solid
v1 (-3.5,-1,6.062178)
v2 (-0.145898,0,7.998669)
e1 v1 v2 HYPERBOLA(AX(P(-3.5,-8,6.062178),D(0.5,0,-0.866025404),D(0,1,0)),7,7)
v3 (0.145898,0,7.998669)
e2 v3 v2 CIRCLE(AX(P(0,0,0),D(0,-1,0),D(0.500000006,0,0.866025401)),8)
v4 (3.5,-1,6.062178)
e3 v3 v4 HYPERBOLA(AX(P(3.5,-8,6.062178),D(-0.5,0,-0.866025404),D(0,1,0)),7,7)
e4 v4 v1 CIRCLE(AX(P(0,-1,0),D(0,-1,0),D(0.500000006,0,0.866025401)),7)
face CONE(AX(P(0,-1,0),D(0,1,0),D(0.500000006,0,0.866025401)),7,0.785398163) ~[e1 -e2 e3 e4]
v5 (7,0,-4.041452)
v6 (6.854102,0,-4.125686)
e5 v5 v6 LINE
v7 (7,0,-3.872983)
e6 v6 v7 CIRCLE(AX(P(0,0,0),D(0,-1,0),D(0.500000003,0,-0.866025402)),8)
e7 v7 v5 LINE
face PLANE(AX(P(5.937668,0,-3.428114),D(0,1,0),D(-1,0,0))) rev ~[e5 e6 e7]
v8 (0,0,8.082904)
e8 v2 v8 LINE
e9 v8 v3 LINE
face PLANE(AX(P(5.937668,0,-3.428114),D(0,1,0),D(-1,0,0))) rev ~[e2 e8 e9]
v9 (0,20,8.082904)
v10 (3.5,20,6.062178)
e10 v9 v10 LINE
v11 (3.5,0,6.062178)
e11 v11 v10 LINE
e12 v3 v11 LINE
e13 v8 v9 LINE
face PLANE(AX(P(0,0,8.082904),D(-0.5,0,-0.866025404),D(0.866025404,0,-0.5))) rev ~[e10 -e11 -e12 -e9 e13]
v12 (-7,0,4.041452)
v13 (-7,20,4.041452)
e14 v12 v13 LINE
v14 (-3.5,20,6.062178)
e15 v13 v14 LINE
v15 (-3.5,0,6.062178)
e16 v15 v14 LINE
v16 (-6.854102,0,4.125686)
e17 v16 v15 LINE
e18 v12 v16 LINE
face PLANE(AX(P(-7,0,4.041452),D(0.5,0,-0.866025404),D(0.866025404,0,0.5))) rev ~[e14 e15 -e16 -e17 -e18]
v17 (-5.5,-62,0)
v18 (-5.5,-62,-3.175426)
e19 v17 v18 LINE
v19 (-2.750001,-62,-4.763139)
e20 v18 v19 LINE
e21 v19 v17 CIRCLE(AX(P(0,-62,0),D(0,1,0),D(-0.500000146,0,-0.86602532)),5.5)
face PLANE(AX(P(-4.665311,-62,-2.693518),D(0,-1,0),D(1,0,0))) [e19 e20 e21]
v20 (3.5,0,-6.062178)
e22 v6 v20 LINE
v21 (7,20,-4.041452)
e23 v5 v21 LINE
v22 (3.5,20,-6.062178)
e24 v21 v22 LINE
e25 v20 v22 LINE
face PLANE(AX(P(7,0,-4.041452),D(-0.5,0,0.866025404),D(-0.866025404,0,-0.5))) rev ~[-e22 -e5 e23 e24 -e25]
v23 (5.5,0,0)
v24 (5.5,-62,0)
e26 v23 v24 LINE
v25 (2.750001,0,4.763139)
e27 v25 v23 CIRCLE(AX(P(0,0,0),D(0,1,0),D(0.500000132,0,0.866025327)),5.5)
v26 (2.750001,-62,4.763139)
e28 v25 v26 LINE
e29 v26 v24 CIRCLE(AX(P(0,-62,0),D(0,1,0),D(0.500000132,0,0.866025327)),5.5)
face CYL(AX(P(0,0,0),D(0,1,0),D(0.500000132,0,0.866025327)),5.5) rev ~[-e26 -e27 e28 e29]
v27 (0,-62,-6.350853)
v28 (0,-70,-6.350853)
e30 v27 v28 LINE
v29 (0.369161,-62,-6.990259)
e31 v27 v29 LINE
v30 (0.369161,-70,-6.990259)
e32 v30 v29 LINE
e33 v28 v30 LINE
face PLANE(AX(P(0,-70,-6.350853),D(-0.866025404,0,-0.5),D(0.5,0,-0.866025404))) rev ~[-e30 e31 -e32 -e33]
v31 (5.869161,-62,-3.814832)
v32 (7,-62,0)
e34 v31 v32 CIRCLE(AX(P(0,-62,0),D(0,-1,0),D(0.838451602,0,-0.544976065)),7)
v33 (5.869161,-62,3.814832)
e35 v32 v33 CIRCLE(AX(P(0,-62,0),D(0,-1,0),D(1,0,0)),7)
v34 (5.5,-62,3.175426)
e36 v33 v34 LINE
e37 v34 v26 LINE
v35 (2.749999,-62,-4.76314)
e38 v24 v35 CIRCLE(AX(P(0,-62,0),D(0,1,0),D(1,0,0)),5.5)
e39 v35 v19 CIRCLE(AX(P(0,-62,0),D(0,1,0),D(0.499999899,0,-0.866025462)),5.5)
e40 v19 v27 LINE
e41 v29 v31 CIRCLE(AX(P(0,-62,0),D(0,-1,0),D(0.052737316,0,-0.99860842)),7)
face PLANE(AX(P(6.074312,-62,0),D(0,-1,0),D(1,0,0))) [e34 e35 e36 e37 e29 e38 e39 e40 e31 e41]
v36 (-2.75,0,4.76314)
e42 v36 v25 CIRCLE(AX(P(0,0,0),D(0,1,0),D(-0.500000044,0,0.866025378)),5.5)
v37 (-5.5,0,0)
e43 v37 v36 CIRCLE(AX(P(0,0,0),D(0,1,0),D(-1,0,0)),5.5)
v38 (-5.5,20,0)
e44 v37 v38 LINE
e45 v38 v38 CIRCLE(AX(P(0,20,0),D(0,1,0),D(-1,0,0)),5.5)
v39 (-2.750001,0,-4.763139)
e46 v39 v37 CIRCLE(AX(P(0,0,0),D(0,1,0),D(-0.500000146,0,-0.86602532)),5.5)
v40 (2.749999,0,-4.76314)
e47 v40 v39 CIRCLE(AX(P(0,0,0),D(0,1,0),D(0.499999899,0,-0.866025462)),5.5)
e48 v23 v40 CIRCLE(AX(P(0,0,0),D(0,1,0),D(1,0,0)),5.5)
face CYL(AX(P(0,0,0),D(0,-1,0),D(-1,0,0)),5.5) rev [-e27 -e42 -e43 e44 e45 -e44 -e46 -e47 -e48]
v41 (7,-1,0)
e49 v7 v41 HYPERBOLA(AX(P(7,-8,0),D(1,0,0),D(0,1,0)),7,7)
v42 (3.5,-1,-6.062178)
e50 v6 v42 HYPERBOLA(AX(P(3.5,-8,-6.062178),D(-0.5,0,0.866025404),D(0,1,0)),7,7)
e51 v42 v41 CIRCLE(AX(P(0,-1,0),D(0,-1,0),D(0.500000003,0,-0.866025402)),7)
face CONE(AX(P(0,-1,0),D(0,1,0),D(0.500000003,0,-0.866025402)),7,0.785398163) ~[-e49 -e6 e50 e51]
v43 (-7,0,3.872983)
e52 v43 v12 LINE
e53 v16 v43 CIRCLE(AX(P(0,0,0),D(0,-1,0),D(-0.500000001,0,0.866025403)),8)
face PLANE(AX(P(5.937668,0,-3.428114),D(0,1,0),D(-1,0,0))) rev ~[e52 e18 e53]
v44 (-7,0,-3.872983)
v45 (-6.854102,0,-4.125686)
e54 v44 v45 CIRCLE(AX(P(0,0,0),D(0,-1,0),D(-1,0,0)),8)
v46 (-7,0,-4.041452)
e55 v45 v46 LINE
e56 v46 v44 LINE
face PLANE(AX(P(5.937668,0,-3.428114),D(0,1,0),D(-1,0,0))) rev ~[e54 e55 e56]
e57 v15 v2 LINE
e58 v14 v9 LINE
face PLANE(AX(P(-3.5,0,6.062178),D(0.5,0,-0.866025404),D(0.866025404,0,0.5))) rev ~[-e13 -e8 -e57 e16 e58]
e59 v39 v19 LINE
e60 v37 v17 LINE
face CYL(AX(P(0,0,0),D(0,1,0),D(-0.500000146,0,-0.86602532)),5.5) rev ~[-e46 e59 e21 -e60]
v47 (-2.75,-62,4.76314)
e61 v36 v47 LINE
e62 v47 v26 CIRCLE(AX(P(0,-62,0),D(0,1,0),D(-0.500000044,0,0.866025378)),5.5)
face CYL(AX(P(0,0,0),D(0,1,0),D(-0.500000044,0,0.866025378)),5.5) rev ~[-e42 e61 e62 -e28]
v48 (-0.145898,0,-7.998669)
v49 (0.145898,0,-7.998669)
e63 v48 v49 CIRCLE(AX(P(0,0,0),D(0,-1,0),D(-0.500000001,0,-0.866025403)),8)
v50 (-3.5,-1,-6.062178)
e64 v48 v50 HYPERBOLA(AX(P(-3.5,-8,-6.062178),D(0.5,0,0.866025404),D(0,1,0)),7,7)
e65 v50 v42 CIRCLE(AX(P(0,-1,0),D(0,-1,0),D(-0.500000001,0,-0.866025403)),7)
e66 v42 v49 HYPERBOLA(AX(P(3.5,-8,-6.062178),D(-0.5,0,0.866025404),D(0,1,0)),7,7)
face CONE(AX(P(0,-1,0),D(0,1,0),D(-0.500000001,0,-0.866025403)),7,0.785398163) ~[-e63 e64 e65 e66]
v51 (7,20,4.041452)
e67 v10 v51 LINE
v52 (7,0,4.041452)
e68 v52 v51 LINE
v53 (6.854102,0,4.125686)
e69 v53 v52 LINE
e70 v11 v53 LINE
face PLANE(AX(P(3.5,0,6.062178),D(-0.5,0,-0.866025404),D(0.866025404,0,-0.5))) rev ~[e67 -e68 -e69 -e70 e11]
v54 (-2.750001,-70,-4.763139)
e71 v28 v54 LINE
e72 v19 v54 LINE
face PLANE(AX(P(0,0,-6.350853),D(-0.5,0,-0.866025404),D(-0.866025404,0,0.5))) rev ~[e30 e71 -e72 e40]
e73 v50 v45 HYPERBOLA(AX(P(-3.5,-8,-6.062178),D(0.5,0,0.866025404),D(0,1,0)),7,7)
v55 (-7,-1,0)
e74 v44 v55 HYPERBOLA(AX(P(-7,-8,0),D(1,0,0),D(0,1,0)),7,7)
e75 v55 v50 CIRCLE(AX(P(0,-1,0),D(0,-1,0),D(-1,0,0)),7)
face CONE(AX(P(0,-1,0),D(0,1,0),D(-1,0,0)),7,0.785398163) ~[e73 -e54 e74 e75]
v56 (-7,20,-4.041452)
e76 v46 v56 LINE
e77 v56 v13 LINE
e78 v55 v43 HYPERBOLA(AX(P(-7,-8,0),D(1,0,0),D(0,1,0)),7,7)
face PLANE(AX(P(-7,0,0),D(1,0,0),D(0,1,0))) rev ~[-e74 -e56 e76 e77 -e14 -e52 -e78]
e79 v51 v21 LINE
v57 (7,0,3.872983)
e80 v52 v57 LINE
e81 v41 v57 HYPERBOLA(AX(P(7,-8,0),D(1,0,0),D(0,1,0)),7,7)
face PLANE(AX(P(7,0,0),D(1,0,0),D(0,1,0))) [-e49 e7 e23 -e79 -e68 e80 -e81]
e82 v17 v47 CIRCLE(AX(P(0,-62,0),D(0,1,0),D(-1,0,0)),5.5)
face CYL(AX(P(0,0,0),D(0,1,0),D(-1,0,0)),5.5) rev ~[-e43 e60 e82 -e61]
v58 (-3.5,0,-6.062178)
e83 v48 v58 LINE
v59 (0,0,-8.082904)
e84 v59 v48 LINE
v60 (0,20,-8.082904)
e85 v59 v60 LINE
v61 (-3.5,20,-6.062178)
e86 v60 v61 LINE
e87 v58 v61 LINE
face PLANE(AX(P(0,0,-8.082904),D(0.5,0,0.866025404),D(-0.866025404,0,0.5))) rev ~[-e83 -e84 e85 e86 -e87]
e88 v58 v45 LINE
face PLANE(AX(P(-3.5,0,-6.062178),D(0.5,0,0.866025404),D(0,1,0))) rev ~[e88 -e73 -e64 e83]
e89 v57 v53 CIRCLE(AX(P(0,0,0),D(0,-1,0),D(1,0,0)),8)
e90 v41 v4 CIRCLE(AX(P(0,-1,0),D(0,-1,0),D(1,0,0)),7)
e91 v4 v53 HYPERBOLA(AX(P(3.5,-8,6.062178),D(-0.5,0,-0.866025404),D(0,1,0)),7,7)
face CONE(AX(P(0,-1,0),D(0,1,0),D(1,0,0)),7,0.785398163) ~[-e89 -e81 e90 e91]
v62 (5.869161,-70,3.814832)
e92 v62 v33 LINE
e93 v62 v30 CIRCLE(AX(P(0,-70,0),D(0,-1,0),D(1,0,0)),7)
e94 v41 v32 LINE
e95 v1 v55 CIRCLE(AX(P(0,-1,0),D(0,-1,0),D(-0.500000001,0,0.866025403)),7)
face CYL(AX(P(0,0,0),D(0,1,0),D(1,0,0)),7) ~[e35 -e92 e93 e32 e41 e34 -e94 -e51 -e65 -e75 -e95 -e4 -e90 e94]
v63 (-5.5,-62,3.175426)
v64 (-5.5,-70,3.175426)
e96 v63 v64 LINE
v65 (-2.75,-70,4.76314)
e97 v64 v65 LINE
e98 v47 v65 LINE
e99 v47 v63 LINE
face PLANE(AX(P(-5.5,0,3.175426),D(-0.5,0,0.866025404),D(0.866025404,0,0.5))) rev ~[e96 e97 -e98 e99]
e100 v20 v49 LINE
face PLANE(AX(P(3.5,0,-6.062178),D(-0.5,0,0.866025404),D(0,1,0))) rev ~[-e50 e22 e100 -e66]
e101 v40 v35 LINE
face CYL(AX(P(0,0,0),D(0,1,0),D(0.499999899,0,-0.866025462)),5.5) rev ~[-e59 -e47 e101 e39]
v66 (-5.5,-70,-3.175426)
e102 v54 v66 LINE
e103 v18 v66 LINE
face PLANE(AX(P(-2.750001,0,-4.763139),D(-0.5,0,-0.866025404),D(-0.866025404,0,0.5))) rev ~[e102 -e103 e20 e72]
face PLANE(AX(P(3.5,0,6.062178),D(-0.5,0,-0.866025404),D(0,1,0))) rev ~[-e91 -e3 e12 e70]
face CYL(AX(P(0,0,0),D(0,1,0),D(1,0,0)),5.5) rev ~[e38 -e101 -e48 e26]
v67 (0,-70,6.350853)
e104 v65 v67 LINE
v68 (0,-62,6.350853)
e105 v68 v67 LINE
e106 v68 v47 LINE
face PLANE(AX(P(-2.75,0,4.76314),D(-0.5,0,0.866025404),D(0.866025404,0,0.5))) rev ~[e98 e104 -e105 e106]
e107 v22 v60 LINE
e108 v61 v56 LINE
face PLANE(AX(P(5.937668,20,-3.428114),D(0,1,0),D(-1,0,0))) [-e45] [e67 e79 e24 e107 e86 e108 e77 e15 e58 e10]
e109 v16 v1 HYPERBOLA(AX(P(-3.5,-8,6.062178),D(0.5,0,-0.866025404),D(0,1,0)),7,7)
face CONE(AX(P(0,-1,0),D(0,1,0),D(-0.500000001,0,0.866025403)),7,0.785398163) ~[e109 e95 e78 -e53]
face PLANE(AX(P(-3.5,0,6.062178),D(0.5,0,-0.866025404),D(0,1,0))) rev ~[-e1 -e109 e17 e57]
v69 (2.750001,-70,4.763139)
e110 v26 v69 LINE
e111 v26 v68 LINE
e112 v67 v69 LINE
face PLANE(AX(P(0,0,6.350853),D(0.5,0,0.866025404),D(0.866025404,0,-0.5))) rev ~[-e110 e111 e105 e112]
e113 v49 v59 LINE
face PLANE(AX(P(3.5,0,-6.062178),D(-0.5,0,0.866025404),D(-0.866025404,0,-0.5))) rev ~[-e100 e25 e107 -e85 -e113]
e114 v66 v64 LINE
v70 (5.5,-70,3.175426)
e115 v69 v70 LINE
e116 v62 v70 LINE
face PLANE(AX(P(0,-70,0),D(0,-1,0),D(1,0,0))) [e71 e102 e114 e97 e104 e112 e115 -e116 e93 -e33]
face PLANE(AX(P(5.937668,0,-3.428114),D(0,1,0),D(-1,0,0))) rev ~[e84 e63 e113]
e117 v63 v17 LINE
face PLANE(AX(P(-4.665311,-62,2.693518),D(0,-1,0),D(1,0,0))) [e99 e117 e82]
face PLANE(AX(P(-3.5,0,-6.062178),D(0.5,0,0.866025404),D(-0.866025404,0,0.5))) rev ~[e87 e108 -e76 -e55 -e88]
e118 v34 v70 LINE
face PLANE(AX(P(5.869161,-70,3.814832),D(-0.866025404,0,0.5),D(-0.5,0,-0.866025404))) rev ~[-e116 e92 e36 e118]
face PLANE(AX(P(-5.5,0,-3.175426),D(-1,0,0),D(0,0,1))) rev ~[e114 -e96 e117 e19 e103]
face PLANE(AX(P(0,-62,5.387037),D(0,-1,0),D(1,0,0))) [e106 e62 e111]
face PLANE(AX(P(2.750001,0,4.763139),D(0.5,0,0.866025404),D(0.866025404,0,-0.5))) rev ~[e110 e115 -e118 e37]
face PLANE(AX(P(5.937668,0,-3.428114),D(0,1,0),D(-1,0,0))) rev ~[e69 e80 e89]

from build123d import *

# Parameters (mm, degrees)
F0_R         = 7
F1_DEPTH     = 70
F2_DEPTH     = 62
F3_R         = 5.5
F4_DEPTH     = 20
F6_DEPTH     = 8
F7_T4_ANGLE  = 59.9999999128
F7_T10_ANGLE = 59.9999996333
F7_T16_ANGLE = 60.0000004539
F7_T22_ANGLE = 59.9999999128
F7_T28_ANGLE = 60.0000002811
F7_T34_ANGLE = 59.9999998061


# Not quite as in the source:
# - a fillet or chamfer that OpenCascade refuses, or shapes differently, is made with other operations: its cross-section is extruded or revolved along the edge and cut away or added


with BuildPart() as f1:
    # F0 (on Front) → F1 (new body)
    with BuildSketch(Plane.XZ):
        Circle(F0_R)
        Polygon((2.7500007272, 4.7631393009), (5.5, 3.1754264805), (5.5, 0), (5.5, -3.1754264805), (2.7499994424, -4.7631400427), (0, -6.3508529611), (-2.7500008008, -4.7631392585), (-5.5, -3.1754264805), (-5.5, 0), (-5.5, 3.1754264805), (-2.7500002446, 4.7631395796), (0, 6.3508529611), align=None, mode=Mode.SUBTRACT)
    extrude(amount=F1_DEPTH)

    # F0 (on Front) → F2 (join)
    with BuildSketch(Plane.XZ):
        with BuildLine():
            Line((5.5, -3.1754264805), (5.5, 0))
            ThreePointArc((5.5, 0), (4.7631395599, -2.7500002788), (2.7499994424, -4.7631400427))
            Line((2.7499994424, -4.7631400427), (5.5, -3.1754264805))
        make_face()
        with BuildLine():
            Line((0, -6.3508529611), (2.7499994424, -4.7631400427))
            ThreePointArc((2.7499994424, -4.7631400427), (-7.842e-07, -5.5), (-2.7500008008, -4.7631392585))
            Line((-2.7500008008, -4.7631392585), (0, -6.3508529611))
        make_face()
        with BuildLine():
            Line((-5.5, -3.1754264805), (-2.7500008008, -4.7631392585))
            ThreePointArc((-2.7500008008, -4.7631392585), (-4.763139952, -2.7499995996), (-5.5, 0))
            Line((-5.5, 0), (-5.5, -3.1754264805))
        make_face()
        with BuildLine():
            ThreePointArc((-5.5, 0), (-4.7631397914, 2.7499998777), (-2.7500002446, 4.7631395796))
            Line((-2.7500002446, 4.7631395796), (-5.5, 3.1754264805))
            Line((-5.5, 3.1754264805), (-5.5, 0))
        make_face()
        with BuildLine():
            ThreePointArc((-2.7500002446, 4.7631395796), (2.787e-07, 5.5), (2.7500007272, 4.7631393009))
            Line((2.7500007272, 4.7631393009), (0, 6.3508529611))
            Line((0, 6.3508529611), (-2.7500002446, 4.7631395796))
        make_face()
        with BuildLine():
            Line((5.5, 0), (5.5, 3.1754264805))
            Line((5.5, 3.1754264805), (2.7500007272, 4.7631393009))
            ThreePointArc((2.7500007272, 4.7631393009), (4.7631399308, 2.7499996364), (5.5, 0))
        make_face()
    extrude(amount=F2_DEPTH)

    # F3 (on face) → F4 (join)
    with BuildSketch(Plane(origin=(0, 0, 0), x_dir=(-1, 0, 0), z_dir=(0, 1, 0))):
        with BuildLine():
            Line((-7, 0), (-7, -4.0414518843))
            Line((-7, -4.0414518843), (-3.5000000457, -6.0621778001))
            ThreePointArc((-3.5000000457, -6.0621778001), (-6.0621778397, -3.4999999772), (-7, 0))
        make_face()
        with BuildLine():
            Line((-7, 4.0414518843), (-7, 0))
            ThreePointArc((-7, 0), (-6.0621778147, 3.5000000204), (-3.4999999591, 6.0621778501))
            Line((-3.4999999591, 6.0621778501), (-7, 4.0414518843))
        make_face()
        with BuildLine():
            ThreePointArc((-3.4999999591, 6.0621778501), (-6.0621778147, 3.5000000204), (-7, 0))
            ThreePointArc((-7, 0), (-6.0621778397, -3.4999999772), (-3.5000000457, -6.0621778001))
            ThreePointArc((-3.5000000457, -6.0621778001), (-3.61e-08, -7), (3.4999999831, -6.0621778362))
            ThreePointArc((3.4999999831, -6.0621778362), (6.0621778216, -3.5000000084), (7, 0))
            ThreePointArc((7, 0), (6.06217782, 3.5000000113), (3.4999999774, 6.0621778395))
            ThreePointArc((3.4999999774, 6.0621778395), (1.05e-08, 7), (-3.4999999591, 6.0621778501))
        make_face()
        Circle(F3_R, mode=Mode.SUBTRACT)
        with BuildLine():
            ThreePointArc((3.4999999831, -6.0621778362), (-3.61e-08, -7), (-3.5000000457, -6.0621778001))
            Line((-3.5000000457, -6.0621778001), (0, -8.0829037687))
            Line((0, -8.0829037687), (3.4999999831, -6.0621778362))
        make_face()
        with BuildLine():
            Line((0, 8.0829037687), (-3.4999999591, 6.0621778501))
            ThreePointArc((-3.4999999591, 6.0621778501), (1.05e-08, 7), (3.4999999774, 6.0621778395))
            Line((3.4999999774, 6.0621778395), (0, 8.0829037687))
        make_face()
        with BuildLine():
            ThreePointArc((7, 0), (6.0621778216, -3.5000000084), (3.4999999831, -6.0621778362))
            Line((3.4999999831, -6.0621778362), (7, -4.0414518843))
            Line((7, -4.0414518843), (7, 0))
        make_face()
        with BuildLine():
            Line((7, 4.0414518843), (3.4999999774, 6.0621778395))
            ThreePointArc((3.4999999774, 6.0621778395), (6.06217782, 3.5000000113), (7, 0))
            Line((7, 0), (7, 4.0414518843))
        make_face()
    extrude(amount=F4_DEPTH)

    # F5 (on face) → F6 (cut, through all)
    with BuildSketch(Plane.XZ.offset(70)):
        with BuildLine():
            Line((5.5, 3.1754264805), (5.5, -3.1754264805))
            Line((5.5, -3.1754264805), (5.869161212, -3.814832456))
            ThreePointArc((5.869161212, -3.814832456), (6.7113384837, -1.9894561463), (7, 0))
            ThreePointArc((7, 0), (6.7113384837, 1.9894561463), (5.869161212, 3.814832456))
            Line((5.869161212, 3.814832456), (5.5, 3.1754264805))
        make_face()
        with BuildLine():
            Line((5.869161212, -3.814832456), (5.5, -3.1754264805))
            Line((5.5, -3.1754264805), (0, -6.3508529611))
            Line((0, -6.3508529611), (0.369161212, -6.9902589365))
            ThreePointArc((0.369161212, -6.9902589365), (3.5, -6.0621778265), (5.869161212, -3.814832456))
        make_face()
    extrude(amount=-F6_DEPTH, mode=Mode.SUBTRACT)

    # F7: chamfer of 1 on 6 edges, made by hand


with BuildPart() as f7_tool2:
    # F7_s3 → F7_t4 (revolve)
    with BuildSketch(Plane.XY):
        Polygon((-7, -1), (-8, 0), (-7, 0), align=None)
    revolve(axis=Axis((0, 0, 0), (0, -1, 0)), revolution_arc=F7_T4_ANGLE)

    split(bisect_by=Plane.YZ.offset(-7), keep=Keep.TOP)

    split(bisect_by=Plane(origin=(-3.5, 0, -6.0621778265), x_dir=(0, 1, 0), z_dir=(0.5, 0, 0.8660254038)), keep=Keep.TOP)


with BuildPart() as f1_1:
    add(f1.part)

    # F7_t1: union F7_tool2
    add(f7_tool2.part)


with BuildPart() as f7_tool8:
    # F7_s9 → F7_t10 (revolve)
    with BuildSketch(Plane.XY):
        Polygon((7, -1), (8, 0), (7, 0), align=None)
    revolve(axis=Axis((0, 0, 0), (0, -1, 0)), revolution_arc=F7_T10_ANGLE)

    split(bisect_by=Plane(origin=(3.5, 0, 6.0621778265), x_dir=(0, 1, 0), z_dir=(-0.5, 0, -0.8660254038)), keep=Keep.TOP)

    split(bisect_by=Plane.YZ.offset(7), keep=Keep.BOTTOM)


with BuildPart() as f1_2:
    add(f1_1.part)

    # F7_t7: union F7_tool8
    add(f7_tool8.part)


with BuildPart() as f7_tool14:
    # F7_s15 → F7_t16 (revolve)
    with BuildSketch(Plane(origin=(0, 0, 0), x_dir=(0, 1, 0), z_dir=(0.8660254006, 0, -0.5000000055))):
        Polygon((-1, 7), (0, 8), (0, 7), align=None)
    revolve(axis=Axis((0, 0, 0), (0, -1, 0)), revolution_arc=F7_T16_ANGLE)

    split(bisect_by=Plane(origin=(3.5, 0, 6.0621778265), x_dir=(0, 1, 0), z_dir=(-0.5, 0, -0.8660254038)), keep=Keep.TOP)

    split(bisect_by=Plane(origin=(-3.5, 0, 6.0621778265), x_dir=(0, 1, 0), z_dir=(0.5, 0, -0.8660254038)), keep=Keep.TOP)


with BuildPart() as f1_3:
    add(f1_2.part)

    # F7_t13: union F7_tool14
    add(f7_tool14.part)


with BuildPart() as f7_tool20:
    # F7_s21 → F7_t22 (revolve)
    with BuildSketch(Plane(origin=(0, 0, 0), x_dir=(0, 1, 0), z_dir=(0.866025403, 0, 0.5000000013))):
        Polygon((-1, 7), (0, 8), (0, 7), align=None)
    revolve(axis=Axis((0, 0, 0), (0, -1, 0)), revolution_arc=F7_T22_ANGLE)

    split(bisect_by=Plane(origin=(-3.5, 0, 6.0621778265), x_dir=(0, 1, 0), z_dir=(0.5, 0, -0.8660254038)), keep=Keep.TOP)

    split(bisect_by=Plane.YZ.offset(-7), keep=Keep.TOP)


with BuildPart() as f1_4:
    add(f1_3.part)

    # F7_t19: union F7_tool20
    add(f7_tool20.part)


with BuildPart() as f7_tool26:
    # F7_s27 → F7_t28 (revolve)
    with BuildSketch(Plane(origin=(0, 0, 0), x_dir=(0, 1, 0), z_dir=(-0.866025403, 0, 0.5000000013))):
        Polygon((-1, 7), (0, 8), (0, 7), align=None)
    revolve(axis=Axis((0, 0, 0), (0, -1, 0)), revolution_arc=F7_T28_ANGLE)

    split(bisect_by=Plane(origin=(3.5, 0, -6.0621778265), x_dir=(0, 1, 0), z_dir=(-0.5, 0, 0.8660254038)), keep=Keep.TOP)

    split(bisect_by=Plane(origin=(-3.5, 0, -6.0621778265), x_dir=(0, 1, 0), z_dir=(0.5, 0, 0.8660254038)), keep=Keep.TOP)


with BuildPart() as f1_5:
    add(f1_4.part)

    # F7_t25: union F7_tool26
    add(f7_tool26.part)


with BuildPart() as f7_tool32:
    # F7_s33 → F7_t34 (revolve)
    with BuildSketch(Plane(origin=(0, 0, 0), x_dir=(0, 1, 0), z_dir=(-0.8660254021, 0, -0.5000000029))):
        Polygon((-1, 7), (0, 8), (0, 7), align=None)
    revolve(axis=Axis((0, 0, 0), (0, -1, 0)), revolution_arc=F7_T34_ANGLE)

    split(bisect_by=Plane(origin=(3.5, 0, -6.0621778265), x_dir=(0, 1, 0), z_dir=(-0.5, 0, 0.8660254038)), keep=Keep.TOP)

    split(bisect_by=Plane.YZ.offset(7), keep=Keep.BOTTOM)


with BuildPart() as f1_6:
    add(f1_5.part)

    # F7_t31: union F7_tool32
    add(f7_tool32.part)


solid = f1_6.part
